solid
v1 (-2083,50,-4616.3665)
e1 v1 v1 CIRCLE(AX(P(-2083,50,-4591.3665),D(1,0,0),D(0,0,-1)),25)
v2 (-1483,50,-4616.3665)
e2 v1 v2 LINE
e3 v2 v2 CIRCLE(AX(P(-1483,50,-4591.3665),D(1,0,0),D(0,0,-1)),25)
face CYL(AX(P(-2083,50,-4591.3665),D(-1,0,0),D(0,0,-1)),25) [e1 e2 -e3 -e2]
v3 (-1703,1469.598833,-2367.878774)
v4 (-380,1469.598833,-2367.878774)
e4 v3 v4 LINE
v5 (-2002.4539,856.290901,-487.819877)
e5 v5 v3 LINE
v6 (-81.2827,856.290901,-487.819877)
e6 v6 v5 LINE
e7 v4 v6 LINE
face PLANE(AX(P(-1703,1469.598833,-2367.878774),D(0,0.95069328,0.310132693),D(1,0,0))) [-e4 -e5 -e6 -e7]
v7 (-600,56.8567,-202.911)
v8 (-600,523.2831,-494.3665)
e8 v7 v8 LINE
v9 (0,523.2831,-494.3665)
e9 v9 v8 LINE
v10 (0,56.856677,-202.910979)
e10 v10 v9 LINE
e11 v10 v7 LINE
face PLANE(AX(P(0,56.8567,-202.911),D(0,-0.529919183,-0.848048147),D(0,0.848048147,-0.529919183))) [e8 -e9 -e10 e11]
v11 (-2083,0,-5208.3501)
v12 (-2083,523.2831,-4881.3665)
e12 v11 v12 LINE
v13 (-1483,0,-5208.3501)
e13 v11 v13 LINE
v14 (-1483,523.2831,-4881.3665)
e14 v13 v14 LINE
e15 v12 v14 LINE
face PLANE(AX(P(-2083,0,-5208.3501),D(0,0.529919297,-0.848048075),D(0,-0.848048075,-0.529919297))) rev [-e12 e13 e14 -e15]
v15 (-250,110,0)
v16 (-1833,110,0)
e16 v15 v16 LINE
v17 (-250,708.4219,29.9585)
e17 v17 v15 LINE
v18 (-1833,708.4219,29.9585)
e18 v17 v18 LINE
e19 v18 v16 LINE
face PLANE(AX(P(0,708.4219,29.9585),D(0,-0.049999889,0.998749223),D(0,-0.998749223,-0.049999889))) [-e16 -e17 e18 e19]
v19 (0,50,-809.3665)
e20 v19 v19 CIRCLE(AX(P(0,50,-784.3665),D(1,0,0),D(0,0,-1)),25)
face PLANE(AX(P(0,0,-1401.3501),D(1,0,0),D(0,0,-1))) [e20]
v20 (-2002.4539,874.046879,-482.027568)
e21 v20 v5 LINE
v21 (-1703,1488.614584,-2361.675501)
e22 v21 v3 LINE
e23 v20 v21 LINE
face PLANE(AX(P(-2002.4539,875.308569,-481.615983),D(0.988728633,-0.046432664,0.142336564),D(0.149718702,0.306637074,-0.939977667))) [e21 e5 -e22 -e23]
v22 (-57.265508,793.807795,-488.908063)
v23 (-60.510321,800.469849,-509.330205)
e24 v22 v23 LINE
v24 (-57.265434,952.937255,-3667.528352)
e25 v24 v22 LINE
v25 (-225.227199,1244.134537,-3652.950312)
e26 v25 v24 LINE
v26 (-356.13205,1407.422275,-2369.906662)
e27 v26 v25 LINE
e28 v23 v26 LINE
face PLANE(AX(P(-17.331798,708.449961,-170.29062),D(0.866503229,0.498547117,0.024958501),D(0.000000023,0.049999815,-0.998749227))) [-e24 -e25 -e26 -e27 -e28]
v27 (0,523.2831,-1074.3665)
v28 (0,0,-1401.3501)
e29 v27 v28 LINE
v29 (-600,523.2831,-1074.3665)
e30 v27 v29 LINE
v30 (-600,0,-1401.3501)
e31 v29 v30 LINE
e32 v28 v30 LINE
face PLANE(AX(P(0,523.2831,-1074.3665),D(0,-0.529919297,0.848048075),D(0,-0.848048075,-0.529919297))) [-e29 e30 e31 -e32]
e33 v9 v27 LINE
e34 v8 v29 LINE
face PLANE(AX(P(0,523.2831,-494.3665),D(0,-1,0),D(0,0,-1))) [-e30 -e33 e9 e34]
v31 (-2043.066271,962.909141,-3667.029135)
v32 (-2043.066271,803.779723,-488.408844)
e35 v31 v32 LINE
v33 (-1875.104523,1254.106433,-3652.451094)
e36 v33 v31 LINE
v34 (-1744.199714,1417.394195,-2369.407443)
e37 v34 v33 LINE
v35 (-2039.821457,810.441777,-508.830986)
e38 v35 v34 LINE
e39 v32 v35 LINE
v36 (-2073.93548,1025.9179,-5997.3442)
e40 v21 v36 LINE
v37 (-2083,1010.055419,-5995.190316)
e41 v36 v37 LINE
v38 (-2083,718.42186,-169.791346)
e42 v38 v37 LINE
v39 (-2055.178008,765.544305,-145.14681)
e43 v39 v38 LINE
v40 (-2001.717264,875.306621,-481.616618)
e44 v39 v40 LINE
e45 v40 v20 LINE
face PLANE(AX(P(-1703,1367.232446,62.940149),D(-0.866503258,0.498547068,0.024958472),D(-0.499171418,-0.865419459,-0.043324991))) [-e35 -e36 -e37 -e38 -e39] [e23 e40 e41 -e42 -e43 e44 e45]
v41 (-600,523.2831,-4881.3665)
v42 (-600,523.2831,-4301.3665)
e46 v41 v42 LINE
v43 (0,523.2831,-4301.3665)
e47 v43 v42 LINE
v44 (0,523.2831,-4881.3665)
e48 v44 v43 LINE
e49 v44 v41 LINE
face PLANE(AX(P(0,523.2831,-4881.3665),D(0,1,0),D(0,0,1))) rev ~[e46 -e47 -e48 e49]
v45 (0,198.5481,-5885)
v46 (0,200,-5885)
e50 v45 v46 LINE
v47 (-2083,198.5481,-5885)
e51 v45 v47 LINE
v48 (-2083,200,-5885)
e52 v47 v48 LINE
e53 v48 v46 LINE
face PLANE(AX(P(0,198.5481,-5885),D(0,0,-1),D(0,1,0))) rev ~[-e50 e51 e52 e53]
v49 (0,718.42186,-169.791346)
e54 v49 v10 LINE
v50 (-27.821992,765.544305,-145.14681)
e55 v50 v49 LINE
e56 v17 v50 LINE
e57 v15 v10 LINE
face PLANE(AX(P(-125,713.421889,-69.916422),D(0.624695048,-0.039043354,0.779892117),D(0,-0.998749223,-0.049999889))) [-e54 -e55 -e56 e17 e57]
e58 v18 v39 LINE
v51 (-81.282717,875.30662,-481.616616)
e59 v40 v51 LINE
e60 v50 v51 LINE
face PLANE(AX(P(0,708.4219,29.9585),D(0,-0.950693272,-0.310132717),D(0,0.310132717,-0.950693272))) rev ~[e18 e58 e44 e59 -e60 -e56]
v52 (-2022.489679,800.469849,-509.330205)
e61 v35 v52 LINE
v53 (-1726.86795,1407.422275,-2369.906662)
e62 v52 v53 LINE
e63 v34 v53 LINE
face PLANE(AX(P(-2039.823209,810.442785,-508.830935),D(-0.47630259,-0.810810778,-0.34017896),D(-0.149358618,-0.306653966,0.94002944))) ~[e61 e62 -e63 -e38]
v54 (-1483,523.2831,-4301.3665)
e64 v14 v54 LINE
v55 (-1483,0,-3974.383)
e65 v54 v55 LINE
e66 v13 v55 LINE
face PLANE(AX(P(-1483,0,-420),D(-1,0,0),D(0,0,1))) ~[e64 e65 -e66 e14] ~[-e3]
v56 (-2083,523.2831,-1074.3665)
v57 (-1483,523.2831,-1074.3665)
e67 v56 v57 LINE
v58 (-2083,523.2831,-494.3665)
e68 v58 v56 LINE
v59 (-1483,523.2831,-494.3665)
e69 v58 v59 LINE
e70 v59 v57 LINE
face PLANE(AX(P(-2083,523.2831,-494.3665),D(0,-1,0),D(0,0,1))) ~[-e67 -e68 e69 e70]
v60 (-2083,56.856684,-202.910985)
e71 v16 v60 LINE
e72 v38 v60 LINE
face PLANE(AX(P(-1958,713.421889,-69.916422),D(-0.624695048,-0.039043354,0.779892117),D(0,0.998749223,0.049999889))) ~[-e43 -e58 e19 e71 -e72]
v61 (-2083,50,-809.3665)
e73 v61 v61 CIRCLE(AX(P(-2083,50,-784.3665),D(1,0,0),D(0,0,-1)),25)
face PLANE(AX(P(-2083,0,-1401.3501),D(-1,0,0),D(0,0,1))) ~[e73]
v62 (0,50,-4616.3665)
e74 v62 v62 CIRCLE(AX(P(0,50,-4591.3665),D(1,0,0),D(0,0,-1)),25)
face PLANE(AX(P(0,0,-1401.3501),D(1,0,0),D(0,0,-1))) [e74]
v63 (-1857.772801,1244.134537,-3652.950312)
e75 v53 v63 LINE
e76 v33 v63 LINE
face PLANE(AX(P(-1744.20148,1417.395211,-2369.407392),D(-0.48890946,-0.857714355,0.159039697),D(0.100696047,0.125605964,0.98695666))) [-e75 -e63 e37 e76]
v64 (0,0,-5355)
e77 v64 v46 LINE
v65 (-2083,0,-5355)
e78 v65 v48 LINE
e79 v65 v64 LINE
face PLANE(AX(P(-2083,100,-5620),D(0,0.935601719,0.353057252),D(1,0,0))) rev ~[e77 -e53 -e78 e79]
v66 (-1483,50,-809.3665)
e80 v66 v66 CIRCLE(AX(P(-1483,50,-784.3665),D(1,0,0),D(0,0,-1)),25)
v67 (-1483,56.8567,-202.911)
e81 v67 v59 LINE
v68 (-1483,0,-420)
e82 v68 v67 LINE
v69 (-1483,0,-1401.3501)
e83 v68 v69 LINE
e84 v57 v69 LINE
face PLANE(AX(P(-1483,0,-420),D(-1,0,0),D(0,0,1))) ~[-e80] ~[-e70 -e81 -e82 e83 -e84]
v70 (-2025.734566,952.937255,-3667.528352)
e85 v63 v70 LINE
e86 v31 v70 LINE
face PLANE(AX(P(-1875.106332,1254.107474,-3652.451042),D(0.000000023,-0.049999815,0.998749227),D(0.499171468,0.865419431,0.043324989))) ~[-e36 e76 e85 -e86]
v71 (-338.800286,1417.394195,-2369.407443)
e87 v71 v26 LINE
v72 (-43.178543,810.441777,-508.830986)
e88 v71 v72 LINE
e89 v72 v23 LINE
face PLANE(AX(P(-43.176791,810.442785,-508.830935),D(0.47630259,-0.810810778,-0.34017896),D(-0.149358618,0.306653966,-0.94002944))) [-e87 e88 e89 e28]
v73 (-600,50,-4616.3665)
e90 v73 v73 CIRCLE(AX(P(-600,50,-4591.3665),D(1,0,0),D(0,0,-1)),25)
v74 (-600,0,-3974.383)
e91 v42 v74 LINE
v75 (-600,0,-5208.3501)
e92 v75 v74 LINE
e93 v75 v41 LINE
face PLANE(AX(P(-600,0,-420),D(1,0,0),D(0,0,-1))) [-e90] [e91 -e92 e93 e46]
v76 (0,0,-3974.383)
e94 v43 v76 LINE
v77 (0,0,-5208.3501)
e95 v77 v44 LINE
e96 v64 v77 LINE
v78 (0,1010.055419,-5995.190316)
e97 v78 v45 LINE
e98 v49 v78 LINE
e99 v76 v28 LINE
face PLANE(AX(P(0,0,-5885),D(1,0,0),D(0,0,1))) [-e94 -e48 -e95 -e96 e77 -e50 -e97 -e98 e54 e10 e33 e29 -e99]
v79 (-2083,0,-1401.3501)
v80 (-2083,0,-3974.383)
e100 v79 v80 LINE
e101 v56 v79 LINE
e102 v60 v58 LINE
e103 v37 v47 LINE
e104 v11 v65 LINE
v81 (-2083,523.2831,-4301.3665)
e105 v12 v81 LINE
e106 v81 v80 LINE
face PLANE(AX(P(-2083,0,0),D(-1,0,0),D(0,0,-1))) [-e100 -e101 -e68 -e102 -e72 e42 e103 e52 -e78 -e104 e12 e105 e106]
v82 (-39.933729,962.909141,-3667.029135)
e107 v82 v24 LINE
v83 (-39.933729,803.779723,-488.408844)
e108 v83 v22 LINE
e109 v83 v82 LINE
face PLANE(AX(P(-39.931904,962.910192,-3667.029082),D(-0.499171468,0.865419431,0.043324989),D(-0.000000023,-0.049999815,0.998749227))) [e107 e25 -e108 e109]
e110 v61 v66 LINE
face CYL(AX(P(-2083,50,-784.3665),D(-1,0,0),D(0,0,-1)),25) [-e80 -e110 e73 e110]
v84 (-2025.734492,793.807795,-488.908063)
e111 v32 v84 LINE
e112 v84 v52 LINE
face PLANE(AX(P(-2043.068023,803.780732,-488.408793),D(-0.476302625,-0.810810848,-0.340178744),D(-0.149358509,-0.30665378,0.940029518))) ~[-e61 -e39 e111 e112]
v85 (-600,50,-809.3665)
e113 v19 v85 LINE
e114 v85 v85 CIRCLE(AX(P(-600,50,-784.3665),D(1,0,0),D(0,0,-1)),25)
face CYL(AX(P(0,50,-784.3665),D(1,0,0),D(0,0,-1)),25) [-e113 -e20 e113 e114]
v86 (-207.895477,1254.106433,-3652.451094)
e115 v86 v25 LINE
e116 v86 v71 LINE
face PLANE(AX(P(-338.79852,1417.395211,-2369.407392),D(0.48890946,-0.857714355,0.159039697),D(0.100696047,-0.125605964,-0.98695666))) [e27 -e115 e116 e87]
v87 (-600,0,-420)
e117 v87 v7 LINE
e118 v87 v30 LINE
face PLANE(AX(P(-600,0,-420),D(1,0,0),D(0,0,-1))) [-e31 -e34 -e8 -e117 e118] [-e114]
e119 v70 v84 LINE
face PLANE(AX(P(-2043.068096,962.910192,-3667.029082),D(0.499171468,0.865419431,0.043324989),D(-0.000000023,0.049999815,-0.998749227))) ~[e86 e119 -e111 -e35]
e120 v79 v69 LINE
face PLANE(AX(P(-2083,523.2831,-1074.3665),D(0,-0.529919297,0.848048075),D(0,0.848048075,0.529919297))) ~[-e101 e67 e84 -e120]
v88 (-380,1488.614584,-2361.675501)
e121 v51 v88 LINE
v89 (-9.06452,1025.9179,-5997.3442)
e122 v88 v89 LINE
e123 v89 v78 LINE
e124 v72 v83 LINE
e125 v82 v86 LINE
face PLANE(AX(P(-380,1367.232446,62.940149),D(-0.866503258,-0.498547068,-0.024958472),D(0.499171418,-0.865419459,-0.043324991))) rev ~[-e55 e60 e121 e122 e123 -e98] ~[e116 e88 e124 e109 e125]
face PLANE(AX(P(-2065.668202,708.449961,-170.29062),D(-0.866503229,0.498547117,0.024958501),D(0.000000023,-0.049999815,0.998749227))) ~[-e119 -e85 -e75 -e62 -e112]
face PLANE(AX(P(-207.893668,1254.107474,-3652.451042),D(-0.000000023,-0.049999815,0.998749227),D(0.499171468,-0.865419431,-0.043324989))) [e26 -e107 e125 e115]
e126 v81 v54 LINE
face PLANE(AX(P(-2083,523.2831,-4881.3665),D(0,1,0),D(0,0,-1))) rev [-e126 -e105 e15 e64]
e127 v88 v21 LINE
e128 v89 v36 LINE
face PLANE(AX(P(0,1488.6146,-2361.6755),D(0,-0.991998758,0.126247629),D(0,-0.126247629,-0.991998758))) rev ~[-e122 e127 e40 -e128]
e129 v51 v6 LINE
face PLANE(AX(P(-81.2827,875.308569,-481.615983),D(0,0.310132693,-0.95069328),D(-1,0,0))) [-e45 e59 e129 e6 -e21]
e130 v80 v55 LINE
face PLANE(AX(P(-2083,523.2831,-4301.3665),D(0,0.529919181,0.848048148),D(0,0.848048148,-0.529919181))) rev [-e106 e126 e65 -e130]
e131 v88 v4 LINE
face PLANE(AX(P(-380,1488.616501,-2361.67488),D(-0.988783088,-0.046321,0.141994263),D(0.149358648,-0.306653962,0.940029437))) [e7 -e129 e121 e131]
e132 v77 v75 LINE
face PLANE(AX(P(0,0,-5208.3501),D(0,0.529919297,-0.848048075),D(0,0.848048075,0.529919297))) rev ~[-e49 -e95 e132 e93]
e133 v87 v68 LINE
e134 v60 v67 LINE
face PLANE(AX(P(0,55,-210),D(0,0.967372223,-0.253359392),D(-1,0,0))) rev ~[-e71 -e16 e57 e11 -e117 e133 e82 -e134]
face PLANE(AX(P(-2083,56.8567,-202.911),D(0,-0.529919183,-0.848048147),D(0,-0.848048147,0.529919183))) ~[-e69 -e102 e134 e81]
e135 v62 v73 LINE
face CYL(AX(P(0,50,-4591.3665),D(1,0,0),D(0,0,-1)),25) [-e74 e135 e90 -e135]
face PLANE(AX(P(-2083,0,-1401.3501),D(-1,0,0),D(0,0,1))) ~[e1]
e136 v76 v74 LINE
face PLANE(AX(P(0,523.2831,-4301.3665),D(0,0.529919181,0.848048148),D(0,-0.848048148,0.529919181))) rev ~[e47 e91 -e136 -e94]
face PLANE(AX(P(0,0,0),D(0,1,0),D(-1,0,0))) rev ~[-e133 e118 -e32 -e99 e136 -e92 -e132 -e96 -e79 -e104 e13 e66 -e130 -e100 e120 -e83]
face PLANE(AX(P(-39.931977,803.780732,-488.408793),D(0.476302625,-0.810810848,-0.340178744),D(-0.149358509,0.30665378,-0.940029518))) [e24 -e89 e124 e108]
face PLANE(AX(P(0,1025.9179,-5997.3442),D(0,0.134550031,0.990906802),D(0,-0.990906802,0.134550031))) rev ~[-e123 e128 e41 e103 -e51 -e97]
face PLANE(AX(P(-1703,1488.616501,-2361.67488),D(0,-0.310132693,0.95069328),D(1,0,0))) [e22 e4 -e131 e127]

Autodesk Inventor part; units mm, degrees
ref_plane "YZ Plane" through (0, 0, 0) normal (1, 0, 0) x (0, 1, 0)
sketch "Sketch1" plane through (0, 0, 0) normal (0, 1, 0) x (-1, 0, 0)
  line L0 (0, 0) -> (2083, 0)
  line L1 (2083, 0) -> (2083, -5885)
  line L2 (2083, -5885) -> (0, -5885)
  line L3 (0, -5885) -> (0, 0)
  dimension "d0" = 2083
  dimension "d1" = 5885
extrude "Extrusion1" add sketch "Sketch1" along normal blind 710
sketch "Sketch2" plane through (0, 0, 0) normal (1, 0, 0) x (0, 0, -1)
  line L0 (0, 710) -> (5885, 710) projected
  line L1 (5885, 710) -> (5885, 1020)
  line L2 (5885, 710) -> (6195, 710) construction
  line L3 (5885, 1020) -> (0, 710)
  line L4 (0, 710) -> (5885, 710)
  point P0 (0, 0)
  dimension "d4" = 310
  dimension "d5" = 90
extrude "Extrusion2" add sketch "Sketch2" against normal up to surface (2083 mm away)
chamfer "Chamfer1" distance 420 distance2 110 1 edges at (-1041.5, 0, 0) measured on face at (-694.3333, 0, -1961.6667)
chamfer "Chamfer2" distance 530 distance2 200 1 edges at (-1041.5, 0, -5885) measured on face at (-694.3333, 0, -2241.6667)
sketch "Sketch3" plane through (0, 110, 0) normal (1, 0, 0) x (0, 0, -1)
  line L0 (0, 600) -> (-29.9585, 598.4219)
  line L1 (5885, 910) -> (0, 600) construction
  line L2 (5885, 910) -> (5997.3442, 915.9179)
  line L3 (5885, 88.5481) -> (5885, 910)
  line L4 (5997.3442, 915.9179) -> (5885, 88.5481)
  line L5 (0, 600) -> (0, 0)
  line L6 (-29.9585, 598.4219) -> (0, 0)
  dimension "d14" = 30
  dimension "d15" = 112.5
extrude "Extrusion3" add sketch "Sketch3" against normal up to surface (2083 mm away)
sketch "Sketch4" plane through (0, 0, -420) normal (1, 0, 0) x (0, 0, -1)
  line L0 (5577.3442, 1025.9179) -> (-449.9585, 708.4219) projected
  line L1 (-449.9585, 708.4219) -> (1941.6755, 1488.6146)
  line L2 (1941.6755, 1488.6146) -> (5577.3442, 1025.9179)
  line L3 (5577.3442, 1025.9179) -> (-449.9585, 708.4219)
  line L4 (1941.6755, 1488.6146) -> (1976.0415, 836.2146)
  point P0 (-420, 0)
  dimension "d20" = 2426
  dimension "d21" = 652.4
extrude "Extrusion4" add sketch "Sketch4" against normal up to surface (2083 mm away)
ref_plane "Work Plane3" through (0, 708.4219, 29.9585) normal (0, -0.0499998, 0.9987492) x (1, 0, 0)
sketch "Sketch6" plane through (0, 708.4219, 29.9585) normal (0, -0.0499998, 0.9987492) x (1, 0, 0)
  line L0 (-2083, 659.6356) -> (-2083, 0) construction
  line L1 (0, 0) -> (-2083, 0) construction
  line L2 (0, 659.6356) -> (0, 0) construction
  line L3 (0, 659.6356) -> (-2083, 659.6356) construction
  line L4 (0, 0) -> (0, 659.6356)
  line L5 (0, 659.6356) -> (-380, 659.6356)
  line L6 (-380, 659.6356) -> (0, 0)
  line L7 (0, 659.6356) -> (0, 0) construction
  line L8 (-2083, 659.6356) -> (-2083, 0) construction
  line L9 (0, 0) -> (-2083, 0) construction
  line L10 (0, 0) -> (-2083, 0) projected
  line L11 (-1041.5, 0) -> (-1041.5, 659.6356) construction
  line L12 (-2083, 659.6356) -> (-2083, 0) construction
  line L13 (-2083, 0) -> (-2083, 659.6356)
  line L14 (-2083, 659.6356) -> (-1703, 659.6356)
  line L15 (-1703, 659.6356) -> (-2083, 0)
  line L16 (-2083, 659.6356) -> (-2083, 0) construction
  point P0 (0, -709.0337)
  dimension "d24" = 380
extrude "Extrusion5" cut sketch "Sketch6" against normal up to surface surface through (0, 1025.9179, -5997.3442) normal (0, -0.1345501, -0.9909068)
chamfer "Chamfer3" distance 250 distance2 200 1 edges at (0, 409.2109, 14.9792) measured on face at (-1388.6667, 309.474, 9.9862)
chamfer "Chamfer4" distance 250 distance2 200 1 edges at (-2083, 409.2109, 14.9792) measured on face at (-1472, 309.474, 9.9862)
sketch "Sketch7" plane through (-1703, 1488.6146, -2361.6755) normal (0, 0.9506933, 0.3101327) x (1, 0, 0)
  line L0 (0, 0) -> (1323, 0)
  line L1 (1323, 0) -> (1621.7173, -1977.5662)
  line L2 (1621.7173, -1977.5662) -> (-299.4539, -1977.5662)
  line L3 (-370.9356, 3312.9084) -> (0, 0) projected
  line L4 (-299.4539, -1977.5662) -> (0, 0)
  point P0 (1703, -2706.8971)
  dimension "d33" = 2000
extrude "Extrusion6" cut sketch "Sketch7" against normal blind 20
sketch "Sketch8" plane through (0, 718.4219, -169.7914) normal (0.8665032, 0.4985471, 0.0249585) x (0, 0.0499998, -0.9987492)
  line L0 (0, 0) -> (-22.2576, 55.7363) projected
  line L1 (5832.6944, 0) -> (0, 0) projected
  line L2 (5835.6387, 18.1589) -> (5832.6944, 0) projected
  line L3 (2227.6521, 761.2615) -> (5835.6387, 18.1589) projected
  line L4 (319.2795, 162.8353) -> (2227.6521, 761.2615) projected
  line L5 (-22.2576, 55.7363) -> (319.2795, 162.8353) projected
  line L6 (5138.8046, 80) -> (322.4868, 80)
  line L7 (322.4868, 80) -> (343.2165, 86.5004)
  line L8 (343.2165, 86.5004) -> (2231.8133, 678.7253)
  line L9 (2231.8133, 678.7253) -> (5138.8046, 80)
  line L10 (2231.8133, 678.7253) -> (3505.0878, 416.4811)
  line L11 (3505.0878, 416.4811) -> (3505.0878, 80)
  point P0 (-205.5, -614.38)
  dimension "d36" = 80
  dimension "d37" = 1300
extrude "Extrusion7" cut sketch "Sketch8" against normal blind 20 contours L6 L7 L8 L9 L11
ref_plane "Work Plane5" through (-1041.5, 0, -420) normal (1, 0, 0) x (0, 0, -1)
mirror "Mirror1" about plane through (-1041.5, 0, -420) normal (1, 0, 0) of "Extrusion7"
sketch "Sketch9" plane through (0, 718.4219, -169.7914) normal (0.8665032, 0.4985471, 0.0249585) x (0, 0.0499998, -0.9987492)
  point P0 (-205.5, -614.38)
sketch "Sketch11" plane through (0, 0, -420) normal (1, 0, 0) x (0, 0, -1)
  line L0 (-217.089, 56.8567) -> (-250.2086, 718.4219) construction
  line L1 (-217.089, 56.8567) -> (-250.2086, 718.4219) construction
  line L2 (0, 0) -> (-217.089, 56.8567) construction
  line L3 (4935, 0) -> (0, 0) construction
  line L4 (5465, 200) -> (4935, 0) construction
  line L5 (5465, 198.5481) -> (5465, 200) construction
  line L6 (5575.1904, 1010.0556) -> (5465, 198.5481) construction
  line L7 (5575.1904, 1010.0556) -> (-250.2086, 718.4219) construction
  line L8 (-217.089, 56.8567) -> (74.3665, 523.2831)
  line L9 (-217.089, 56.8567) -> (332.911, 56.8567) construction
  line L10 (74.3665, 523.2831) -> (654.3665, 523.2831)
  line L11 (654.3665, 523.2831) -> (981.3501, 0)
  line L12 (0, 0) -> (-217.089, 56.8567) projected
  line L13 (-217.089, 56.8567) -> (0, 0)
  line L14 (0, 0) -> (981.3501, 0)
  line L15 (364.3665, 523.2831) -> (364.3665, 0) construction
  line L16 (0, 0) -> (4935, 0) construction
  line L17 (364.3665, 0) -> (4171.3665, 0) construction
  line L18 (2267.8665, 0) -> (2267.8665, 523.2831) construction
  line L19 (4788.3501, 0) -> (4461.3665, 523.2831)
  line L20 (4461.3665, 523.2831) -> (3881.3665, 523.2831)
  line L21 (3881.3665, 523.2831) -> (3554.383, 0)
  line L22 (4788.3501, 0) -> (3554.383, 0)
  point P0 (-420, 0)
  point P1 (4752.8221, 56.8567)
  dimension "d44" = 550
  dimension "d45" = 58
  dimension "d46" = 580
  dimension "d47" = 122
  dimension "d48" = 3807
extrude "Extrusion9" cut sketch "Sketch11" against normal blind 600
mirror "Mirror2" about plane through (-1041.5, 0, -420) normal (1, 0, 0) of "Extrusion9"
sketch "Sketch12" plane through (0, 0, -1401.3501) normal (1, 0, 0) x (0, 0, -1)
  line L0 (-326.9836, 523.2831) -> (0, 0) construction
  line L1 (2573.0328, 0) -> (0, 0) construction
  line L2 (2573.0328, 0) -> (2900.0164, 523.2831) construction
  line L3 (2900.0164, 523.2831) -> (3480.0164, 523.2831) construction
  line L4 (3480.0164, 523.2831) -> (3807, 0) construction
  line L5 (3953.6499, 0) -> (3807, 0) construction
  line L6 (4483.6499, 200) -> (3953.6499, 0) construction
  line L7 (4483.6499, 198.5481) -> (4483.6499, 200) construction
  line L8 (4593.8403, 1010.0556) -> (4483.6499, 198.5481) construction
  line L9 (4593.8403, 1010.0556) -> (-1231.5587, 718.4219) construction
  line L10 (-1198.4392, 56.8567) -> (-1231.5587, 718.4219) construction
  line L11 (-1198.4392, 56.8567) -> (-906.9836, 523.2831) construction
  line L12 (-906.9836, 523.2831) -> (-326.9836, 523.2831) construction
  line L13 (0, 0) -> (-981.3501, 0) construction
  line L14 (-326.9836, 523.2831) -> (0, 0) construction
  line L15 (-906.9836, 523.2831) -> (-326.9836, 523.2831) construction
  line L16 (-1198.4392, 56.8567) -> (-906.9836, 523.2831) construction
  line L17 (-981.3501, 0) -> (-1198.4392, 56.8567) construction
  line L18 (-326.9836, 523.2831) -> (-906.9836, 523.2831) construction
  line L19 (-616.9836, 523.2831) -> (-616.9836, 0) construction
  line L20 (-981.3501, 0) -> (0, 0) construction
  line L21 (2573.0328, 0) -> (0, 0) construction
  line L22 (1286.5164, 0) -> (1286.5164, 696.1124) construction
  circle A0 centre (-616.9836, 50) radius 25
  circle A1 centre (3190.0164, 50) radius 25
  point P0 (-1401.3501, 0)
  dimension "d51" = 50
  dimension "d53" = 50
extrude "Extrusion10" add sketch "Sketch12" against normal up to surface (600 mm away)
mirror "Mirror3" about plane through (-1041.5, 0, -420) normal (1, 0, 0) of "Extrusion10"
properties part number "02Cybertruck"
